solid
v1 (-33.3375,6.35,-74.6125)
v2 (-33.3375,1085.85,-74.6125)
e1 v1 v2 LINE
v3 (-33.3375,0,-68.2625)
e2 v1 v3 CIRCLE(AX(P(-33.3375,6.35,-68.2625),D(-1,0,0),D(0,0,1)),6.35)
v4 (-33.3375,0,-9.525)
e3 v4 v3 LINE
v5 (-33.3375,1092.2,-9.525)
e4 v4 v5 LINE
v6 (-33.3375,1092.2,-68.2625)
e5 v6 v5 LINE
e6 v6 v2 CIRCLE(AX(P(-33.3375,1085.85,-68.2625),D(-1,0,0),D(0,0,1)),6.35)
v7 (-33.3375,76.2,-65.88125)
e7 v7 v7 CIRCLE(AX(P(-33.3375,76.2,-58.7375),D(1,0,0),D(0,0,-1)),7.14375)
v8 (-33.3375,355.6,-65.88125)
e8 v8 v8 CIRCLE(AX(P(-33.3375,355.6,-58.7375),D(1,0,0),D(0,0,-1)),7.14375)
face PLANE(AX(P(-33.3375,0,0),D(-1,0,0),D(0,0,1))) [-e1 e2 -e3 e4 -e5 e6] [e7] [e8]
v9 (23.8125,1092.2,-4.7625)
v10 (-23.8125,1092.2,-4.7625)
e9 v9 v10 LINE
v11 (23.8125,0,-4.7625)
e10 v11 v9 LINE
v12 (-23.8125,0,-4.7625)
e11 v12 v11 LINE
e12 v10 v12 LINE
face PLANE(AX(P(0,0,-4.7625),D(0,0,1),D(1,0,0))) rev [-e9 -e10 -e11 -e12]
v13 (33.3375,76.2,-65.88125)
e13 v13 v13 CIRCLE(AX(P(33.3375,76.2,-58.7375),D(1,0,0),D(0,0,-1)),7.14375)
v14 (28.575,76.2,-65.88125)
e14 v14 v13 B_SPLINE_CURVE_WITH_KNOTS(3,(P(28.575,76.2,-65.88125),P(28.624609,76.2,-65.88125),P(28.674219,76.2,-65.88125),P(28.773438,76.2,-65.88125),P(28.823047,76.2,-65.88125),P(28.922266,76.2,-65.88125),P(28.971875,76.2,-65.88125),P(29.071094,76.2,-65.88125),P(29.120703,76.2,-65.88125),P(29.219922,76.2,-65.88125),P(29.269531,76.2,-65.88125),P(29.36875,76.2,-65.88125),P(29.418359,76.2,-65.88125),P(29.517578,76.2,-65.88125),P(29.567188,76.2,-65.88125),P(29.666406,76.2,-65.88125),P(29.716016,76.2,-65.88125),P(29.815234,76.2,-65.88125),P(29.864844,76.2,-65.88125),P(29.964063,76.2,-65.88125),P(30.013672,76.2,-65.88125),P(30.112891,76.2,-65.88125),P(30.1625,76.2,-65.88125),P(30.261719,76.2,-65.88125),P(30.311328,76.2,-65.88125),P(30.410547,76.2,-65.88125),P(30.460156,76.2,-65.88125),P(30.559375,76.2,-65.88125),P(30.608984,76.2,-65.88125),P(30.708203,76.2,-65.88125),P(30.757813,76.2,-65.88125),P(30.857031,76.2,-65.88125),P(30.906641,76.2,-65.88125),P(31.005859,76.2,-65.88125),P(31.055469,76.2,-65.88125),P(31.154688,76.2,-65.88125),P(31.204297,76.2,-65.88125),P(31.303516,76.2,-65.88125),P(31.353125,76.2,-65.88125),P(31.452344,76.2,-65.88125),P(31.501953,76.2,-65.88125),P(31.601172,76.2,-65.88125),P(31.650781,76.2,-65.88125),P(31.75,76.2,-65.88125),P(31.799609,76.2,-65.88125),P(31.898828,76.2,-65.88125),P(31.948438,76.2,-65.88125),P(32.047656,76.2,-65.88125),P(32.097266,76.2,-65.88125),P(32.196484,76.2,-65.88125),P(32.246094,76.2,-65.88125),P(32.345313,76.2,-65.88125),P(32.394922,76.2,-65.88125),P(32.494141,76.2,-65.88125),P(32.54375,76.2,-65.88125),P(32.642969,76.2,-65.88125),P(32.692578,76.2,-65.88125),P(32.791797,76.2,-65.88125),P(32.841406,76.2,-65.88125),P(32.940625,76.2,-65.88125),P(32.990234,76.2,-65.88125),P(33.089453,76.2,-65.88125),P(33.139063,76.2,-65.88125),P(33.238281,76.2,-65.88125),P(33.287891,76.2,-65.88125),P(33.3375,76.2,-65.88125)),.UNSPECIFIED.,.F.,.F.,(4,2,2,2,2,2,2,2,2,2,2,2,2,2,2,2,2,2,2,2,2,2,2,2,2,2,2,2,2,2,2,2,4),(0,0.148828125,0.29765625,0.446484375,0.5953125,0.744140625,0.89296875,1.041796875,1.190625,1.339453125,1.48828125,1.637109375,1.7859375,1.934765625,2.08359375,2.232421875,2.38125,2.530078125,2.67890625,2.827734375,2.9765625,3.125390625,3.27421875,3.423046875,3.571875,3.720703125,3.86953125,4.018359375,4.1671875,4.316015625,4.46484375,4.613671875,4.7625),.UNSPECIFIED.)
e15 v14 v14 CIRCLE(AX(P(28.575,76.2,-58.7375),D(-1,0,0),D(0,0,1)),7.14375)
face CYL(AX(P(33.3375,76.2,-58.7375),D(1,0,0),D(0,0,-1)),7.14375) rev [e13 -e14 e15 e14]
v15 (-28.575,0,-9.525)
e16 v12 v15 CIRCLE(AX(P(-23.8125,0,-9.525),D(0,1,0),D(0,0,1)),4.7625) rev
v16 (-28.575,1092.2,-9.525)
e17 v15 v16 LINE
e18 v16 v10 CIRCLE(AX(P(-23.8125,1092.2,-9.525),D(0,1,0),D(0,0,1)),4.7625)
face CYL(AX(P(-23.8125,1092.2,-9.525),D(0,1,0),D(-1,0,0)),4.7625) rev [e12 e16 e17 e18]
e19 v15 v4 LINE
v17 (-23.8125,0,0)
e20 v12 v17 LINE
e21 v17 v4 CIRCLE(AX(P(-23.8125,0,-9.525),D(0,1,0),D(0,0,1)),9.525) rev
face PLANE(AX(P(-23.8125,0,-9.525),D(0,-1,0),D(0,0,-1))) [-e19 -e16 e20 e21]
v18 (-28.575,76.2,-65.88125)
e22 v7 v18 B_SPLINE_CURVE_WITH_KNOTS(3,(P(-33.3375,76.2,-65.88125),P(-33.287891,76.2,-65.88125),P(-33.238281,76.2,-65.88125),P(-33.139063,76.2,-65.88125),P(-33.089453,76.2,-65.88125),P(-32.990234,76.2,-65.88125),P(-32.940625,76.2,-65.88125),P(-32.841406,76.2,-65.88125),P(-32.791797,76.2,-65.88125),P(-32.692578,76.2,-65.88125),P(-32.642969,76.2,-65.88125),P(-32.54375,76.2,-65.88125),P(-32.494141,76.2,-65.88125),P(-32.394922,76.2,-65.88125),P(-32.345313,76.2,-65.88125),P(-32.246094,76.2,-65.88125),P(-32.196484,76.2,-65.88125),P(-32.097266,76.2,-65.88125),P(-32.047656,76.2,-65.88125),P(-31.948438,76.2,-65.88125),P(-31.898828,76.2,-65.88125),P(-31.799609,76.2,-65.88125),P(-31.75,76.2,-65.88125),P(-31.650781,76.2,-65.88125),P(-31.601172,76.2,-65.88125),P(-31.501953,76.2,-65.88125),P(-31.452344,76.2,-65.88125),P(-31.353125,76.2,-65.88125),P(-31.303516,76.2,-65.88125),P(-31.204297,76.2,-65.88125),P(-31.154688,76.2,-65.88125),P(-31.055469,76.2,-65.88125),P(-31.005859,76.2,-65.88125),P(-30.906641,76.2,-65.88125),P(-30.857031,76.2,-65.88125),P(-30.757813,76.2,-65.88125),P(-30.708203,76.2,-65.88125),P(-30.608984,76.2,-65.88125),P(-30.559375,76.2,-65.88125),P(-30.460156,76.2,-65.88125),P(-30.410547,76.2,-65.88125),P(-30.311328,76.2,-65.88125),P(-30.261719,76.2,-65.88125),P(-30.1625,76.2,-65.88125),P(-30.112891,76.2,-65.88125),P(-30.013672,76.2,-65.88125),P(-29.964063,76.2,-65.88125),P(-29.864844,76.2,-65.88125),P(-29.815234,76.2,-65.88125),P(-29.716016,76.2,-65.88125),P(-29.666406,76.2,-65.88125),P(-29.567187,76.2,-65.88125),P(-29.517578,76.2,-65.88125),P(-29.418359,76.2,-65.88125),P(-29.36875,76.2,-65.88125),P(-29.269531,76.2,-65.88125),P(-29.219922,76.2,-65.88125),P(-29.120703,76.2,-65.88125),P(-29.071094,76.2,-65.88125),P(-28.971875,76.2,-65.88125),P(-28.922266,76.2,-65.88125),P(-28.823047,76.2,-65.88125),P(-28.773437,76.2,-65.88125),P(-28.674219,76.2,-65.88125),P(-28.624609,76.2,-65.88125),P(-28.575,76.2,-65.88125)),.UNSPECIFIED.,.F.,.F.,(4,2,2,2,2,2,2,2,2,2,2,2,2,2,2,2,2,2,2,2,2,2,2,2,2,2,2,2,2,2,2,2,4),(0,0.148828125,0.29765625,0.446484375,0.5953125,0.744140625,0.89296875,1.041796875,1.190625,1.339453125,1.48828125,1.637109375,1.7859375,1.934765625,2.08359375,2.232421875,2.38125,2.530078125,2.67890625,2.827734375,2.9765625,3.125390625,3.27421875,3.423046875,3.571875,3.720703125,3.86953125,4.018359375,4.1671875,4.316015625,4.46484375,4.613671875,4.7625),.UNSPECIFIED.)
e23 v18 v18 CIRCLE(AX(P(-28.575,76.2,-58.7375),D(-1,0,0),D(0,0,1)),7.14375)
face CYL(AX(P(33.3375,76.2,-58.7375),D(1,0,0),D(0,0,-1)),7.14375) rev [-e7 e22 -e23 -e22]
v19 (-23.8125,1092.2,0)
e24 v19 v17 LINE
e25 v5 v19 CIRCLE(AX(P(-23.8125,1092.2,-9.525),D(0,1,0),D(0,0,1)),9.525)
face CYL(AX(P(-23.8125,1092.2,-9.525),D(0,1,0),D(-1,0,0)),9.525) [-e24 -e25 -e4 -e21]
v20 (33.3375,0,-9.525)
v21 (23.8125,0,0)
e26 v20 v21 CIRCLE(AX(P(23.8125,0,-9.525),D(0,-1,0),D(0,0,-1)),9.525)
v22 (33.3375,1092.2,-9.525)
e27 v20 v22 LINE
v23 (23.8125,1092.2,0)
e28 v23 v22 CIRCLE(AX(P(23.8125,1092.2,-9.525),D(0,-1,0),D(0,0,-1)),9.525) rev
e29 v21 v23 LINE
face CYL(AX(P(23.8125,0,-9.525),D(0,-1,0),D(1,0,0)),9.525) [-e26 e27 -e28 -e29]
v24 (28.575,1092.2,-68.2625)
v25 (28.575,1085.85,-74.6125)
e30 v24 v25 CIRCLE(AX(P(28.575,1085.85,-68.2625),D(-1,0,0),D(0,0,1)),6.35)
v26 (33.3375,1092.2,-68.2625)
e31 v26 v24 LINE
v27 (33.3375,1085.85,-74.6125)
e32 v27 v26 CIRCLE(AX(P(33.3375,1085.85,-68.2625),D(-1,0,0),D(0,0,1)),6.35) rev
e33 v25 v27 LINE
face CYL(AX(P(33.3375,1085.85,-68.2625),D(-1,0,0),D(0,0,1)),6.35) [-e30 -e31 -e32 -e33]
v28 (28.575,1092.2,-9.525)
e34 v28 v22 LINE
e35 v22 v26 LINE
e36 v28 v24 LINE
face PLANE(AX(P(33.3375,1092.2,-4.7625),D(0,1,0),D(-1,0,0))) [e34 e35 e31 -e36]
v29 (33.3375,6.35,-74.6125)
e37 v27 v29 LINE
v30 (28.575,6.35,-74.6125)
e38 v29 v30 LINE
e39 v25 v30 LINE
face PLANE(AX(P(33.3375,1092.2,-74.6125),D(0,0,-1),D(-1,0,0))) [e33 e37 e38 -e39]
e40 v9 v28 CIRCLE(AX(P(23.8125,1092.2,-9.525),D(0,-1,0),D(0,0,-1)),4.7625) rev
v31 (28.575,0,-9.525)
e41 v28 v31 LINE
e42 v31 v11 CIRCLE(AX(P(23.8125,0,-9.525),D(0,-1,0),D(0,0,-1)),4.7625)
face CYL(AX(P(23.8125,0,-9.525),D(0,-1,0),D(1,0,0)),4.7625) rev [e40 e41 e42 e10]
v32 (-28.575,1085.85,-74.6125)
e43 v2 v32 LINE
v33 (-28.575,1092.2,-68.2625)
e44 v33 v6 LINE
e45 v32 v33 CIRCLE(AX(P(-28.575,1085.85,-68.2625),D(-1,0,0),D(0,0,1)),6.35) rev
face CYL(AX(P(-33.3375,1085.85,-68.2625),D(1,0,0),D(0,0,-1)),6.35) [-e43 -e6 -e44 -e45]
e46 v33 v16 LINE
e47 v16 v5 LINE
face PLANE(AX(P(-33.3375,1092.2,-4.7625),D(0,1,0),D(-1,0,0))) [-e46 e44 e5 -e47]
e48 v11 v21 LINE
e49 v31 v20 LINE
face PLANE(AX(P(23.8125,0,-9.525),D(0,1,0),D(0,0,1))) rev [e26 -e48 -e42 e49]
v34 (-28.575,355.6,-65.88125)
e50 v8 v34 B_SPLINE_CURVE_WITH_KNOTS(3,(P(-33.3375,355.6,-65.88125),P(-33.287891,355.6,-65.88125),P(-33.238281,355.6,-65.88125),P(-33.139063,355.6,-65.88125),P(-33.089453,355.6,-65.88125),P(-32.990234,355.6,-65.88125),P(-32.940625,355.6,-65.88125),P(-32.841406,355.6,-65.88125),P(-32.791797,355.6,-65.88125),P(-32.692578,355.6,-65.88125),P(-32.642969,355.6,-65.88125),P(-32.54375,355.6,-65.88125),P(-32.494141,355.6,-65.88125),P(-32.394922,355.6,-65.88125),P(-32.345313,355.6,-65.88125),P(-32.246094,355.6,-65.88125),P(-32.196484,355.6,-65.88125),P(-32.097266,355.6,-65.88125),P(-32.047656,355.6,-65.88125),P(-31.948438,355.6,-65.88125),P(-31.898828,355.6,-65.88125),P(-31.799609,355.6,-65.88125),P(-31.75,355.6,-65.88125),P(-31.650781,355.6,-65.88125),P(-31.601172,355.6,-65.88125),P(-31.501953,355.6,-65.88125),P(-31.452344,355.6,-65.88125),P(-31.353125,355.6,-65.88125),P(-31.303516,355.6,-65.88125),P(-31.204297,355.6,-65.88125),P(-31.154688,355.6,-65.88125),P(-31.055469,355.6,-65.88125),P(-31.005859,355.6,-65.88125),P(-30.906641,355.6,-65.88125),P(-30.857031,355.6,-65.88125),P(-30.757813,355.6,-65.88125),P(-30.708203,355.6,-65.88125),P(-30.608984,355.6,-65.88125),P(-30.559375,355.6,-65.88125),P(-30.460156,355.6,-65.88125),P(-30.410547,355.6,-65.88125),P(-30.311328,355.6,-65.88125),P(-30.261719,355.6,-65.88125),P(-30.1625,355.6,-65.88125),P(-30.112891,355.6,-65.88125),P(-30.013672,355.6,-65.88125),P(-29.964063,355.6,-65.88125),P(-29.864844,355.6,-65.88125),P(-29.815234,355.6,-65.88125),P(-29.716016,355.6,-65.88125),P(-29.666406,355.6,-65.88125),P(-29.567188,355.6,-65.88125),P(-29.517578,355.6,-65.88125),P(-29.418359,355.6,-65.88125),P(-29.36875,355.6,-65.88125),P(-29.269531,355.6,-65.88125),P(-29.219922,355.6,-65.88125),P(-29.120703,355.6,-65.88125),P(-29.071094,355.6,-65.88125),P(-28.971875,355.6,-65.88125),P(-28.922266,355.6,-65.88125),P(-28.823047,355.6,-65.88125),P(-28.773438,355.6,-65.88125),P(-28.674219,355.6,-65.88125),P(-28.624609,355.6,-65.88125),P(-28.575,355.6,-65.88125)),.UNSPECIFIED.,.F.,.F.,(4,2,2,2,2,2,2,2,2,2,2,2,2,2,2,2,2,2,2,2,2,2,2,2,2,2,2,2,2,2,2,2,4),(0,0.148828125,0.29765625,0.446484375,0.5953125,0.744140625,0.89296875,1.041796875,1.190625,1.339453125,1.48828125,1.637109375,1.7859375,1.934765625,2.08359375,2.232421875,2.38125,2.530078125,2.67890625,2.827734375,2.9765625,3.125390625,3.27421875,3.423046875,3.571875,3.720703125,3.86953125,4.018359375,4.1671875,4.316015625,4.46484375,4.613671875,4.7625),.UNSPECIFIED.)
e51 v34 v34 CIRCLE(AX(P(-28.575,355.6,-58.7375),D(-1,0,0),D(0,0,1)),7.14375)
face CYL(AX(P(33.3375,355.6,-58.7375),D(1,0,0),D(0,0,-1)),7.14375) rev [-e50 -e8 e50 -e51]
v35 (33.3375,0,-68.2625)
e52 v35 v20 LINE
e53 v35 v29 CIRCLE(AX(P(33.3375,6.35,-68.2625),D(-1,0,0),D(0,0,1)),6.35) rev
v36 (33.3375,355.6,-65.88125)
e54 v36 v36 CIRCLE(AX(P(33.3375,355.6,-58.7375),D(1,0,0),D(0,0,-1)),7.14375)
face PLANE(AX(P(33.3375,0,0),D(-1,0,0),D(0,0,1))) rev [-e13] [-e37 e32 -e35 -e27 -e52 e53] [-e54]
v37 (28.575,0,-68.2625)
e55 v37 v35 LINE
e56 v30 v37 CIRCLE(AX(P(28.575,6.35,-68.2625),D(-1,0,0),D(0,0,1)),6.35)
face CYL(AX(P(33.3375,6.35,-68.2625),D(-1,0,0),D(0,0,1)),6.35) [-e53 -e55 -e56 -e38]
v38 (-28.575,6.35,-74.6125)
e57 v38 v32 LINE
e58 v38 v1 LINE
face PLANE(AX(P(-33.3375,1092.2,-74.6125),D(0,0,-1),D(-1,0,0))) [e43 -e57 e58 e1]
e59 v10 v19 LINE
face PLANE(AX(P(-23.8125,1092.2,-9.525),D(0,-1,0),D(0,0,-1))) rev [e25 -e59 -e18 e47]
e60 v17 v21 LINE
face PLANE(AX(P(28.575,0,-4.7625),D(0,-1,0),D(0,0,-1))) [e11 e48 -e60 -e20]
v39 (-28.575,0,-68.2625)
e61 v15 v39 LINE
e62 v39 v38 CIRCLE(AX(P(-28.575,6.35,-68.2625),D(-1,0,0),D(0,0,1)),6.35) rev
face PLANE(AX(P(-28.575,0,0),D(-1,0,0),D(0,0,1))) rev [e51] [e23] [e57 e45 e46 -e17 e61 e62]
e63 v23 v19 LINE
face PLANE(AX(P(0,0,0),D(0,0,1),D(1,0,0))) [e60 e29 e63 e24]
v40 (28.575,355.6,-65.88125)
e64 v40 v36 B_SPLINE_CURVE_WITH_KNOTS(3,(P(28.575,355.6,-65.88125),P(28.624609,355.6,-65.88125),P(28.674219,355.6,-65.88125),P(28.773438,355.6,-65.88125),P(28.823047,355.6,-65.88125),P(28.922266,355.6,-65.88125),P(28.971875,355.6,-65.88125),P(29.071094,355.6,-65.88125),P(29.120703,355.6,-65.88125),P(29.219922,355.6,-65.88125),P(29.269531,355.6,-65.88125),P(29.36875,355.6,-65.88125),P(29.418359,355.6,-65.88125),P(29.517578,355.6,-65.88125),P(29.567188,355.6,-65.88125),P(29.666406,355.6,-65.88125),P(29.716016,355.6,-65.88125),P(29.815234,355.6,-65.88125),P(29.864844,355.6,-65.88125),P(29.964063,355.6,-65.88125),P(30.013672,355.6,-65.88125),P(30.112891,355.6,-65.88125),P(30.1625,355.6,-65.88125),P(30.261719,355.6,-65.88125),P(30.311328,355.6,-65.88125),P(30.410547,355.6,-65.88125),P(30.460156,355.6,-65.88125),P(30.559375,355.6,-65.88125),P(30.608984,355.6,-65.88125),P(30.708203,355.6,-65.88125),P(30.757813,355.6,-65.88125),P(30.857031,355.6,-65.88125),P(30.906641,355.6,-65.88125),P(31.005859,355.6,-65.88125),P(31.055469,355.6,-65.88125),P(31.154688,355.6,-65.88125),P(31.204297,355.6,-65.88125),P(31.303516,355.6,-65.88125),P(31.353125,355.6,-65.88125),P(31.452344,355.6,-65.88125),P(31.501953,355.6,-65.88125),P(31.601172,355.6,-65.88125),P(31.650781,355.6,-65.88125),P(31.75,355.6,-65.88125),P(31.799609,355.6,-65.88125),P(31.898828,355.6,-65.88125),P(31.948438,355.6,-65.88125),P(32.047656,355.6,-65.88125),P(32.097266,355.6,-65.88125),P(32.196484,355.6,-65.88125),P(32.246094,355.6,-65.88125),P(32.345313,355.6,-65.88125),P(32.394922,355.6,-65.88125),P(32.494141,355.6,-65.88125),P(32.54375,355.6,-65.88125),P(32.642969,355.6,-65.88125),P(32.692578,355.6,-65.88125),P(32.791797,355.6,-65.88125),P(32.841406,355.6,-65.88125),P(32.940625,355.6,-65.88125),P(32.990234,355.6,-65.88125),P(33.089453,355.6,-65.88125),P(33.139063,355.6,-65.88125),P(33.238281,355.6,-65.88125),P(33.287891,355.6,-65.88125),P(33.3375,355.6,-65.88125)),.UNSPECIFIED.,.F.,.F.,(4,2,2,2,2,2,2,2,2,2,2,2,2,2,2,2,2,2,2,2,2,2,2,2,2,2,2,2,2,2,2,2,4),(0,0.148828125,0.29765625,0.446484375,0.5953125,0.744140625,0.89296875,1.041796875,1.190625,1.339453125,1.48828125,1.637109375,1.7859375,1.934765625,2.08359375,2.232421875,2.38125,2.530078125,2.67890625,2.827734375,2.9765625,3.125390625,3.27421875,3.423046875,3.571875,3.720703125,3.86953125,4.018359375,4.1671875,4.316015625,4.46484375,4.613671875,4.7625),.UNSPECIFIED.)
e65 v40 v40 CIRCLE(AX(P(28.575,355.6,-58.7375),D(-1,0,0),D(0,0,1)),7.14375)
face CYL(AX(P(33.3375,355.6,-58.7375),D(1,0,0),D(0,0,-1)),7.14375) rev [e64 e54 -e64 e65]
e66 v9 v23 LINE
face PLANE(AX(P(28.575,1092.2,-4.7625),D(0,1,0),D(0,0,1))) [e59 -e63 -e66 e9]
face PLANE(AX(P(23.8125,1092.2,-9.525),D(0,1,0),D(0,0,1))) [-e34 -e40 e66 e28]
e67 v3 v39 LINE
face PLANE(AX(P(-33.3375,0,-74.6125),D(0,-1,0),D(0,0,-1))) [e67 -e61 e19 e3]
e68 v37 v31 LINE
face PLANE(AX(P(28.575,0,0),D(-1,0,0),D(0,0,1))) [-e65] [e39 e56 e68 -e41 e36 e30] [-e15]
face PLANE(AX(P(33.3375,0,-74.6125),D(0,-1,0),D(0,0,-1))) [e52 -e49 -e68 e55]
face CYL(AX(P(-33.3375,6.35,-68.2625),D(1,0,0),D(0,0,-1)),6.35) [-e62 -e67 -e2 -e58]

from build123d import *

# Parameters (mm, degrees)
SKETCH1_W                      = 57.15
SKETCH1_H                      = 1092.2
BASE_FLANGE1_DEPTH             = 4.7625
EDGE_FLANGE1_STRIP_W           = 28.575
EDGE_FLANGE1_STRIP_H           = 4.7625
EDGE_FLANGE1_STRIP_CUT_DEPTH   = 1092.2
EDGE_FLANGE1_STRIP_2_W         = 28.575
EDGE_FLANGE1_STRIP_2_H         = 4.7625
EDGE_FLANGE1_STRIP_CUT_2_DEPTH = 1092.2
EDGE_FLANGE1_DEPTH             = 1092.2
EDGE_FLANGE1_BEND_DEPTH        = 1092.2
F_1_2_CLEARANCE_HOLE1_D        = 14.2875
FILLET1_R                      = 6.35


# Sheet-metal steps are written as plain solids
with BuildPart() as part:
    # Sketch1 → Base-Flange1 (new body)
    with BuildSketch(Plane.XY):
        with Locations((0, 546.1)):
            Rectangle(SKETCH1_W, SKETCH1_H)
    extrude(amount=-BASE_FLANGE1_DEPTH)

    # Edge-Flange1 strip (across the edge) → Edge-Flange1 strip cut (cut)
    with BuildSketch(Plane(origin=(-28.575, 0, -4.7625), x_dir=(1, 0, 0), z_dir=(0, 1, 0))):
        with Locations((-9.525, -2.38125)):
            Rectangle(EDGE_FLANGE1_STRIP_W, EDGE_FLANGE1_STRIP_H)
    extrude(amount=EDGE_FLANGE1_STRIP_CUT_DEPTH, mode=Mode.SUBTRACT)

    # Edge-Flange1 strip 2 (across the edge) → Edge-Flange1 strip cut 2 (cut)
    with BuildSketch(Plane(origin=(28.575, 1092.2, -4.7625), x_dir=(-1, 0, 0), z_dir=(0, -1, 0))):
        with Locations((-9.525, -2.38125)):
            Rectangle(EDGE_FLANGE1_STRIP_2_W, EDGE_FLANGE1_STRIP_2_H)
    extrude(amount=EDGE_FLANGE1_STRIP_CUT_2_DEPTH, mode=Mode.SUBTRACT)

    # Edge-Flange1 section (across the edge) → Edge-Flange1 (add)
    with BuildSketch(Plane(origin=(-28.575, 0, -4.7625), x_dir=(1, 0, 0), z_dir=(0, 1, 0))):
        with BuildLine():
            Line((-4.7625, 4.7625), (-4.7625, 69.85))
            Line((-4.7625, 69.85), (0, 69.85))
            Line((0, 69.85), (0, 4.7625))
            ThreePointArc((0, 4.7625), (1.394903955, 1.394903955), (4.7625, 0))
            Line((4.7625, 0), (4.7625, -4.7625))
            ThreePointArc((4.7625, -4.7625), (-1.972692091, -1.972692091), (-4.7625, 4.7625))
        make_face()
    extrude(amount=EDGE_FLANGE1_DEPTH)

    # Edge-Flange1 section 2 (across the edge) → Edge-Flange1 bend (add)
    with BuildSketch(Plane(origin=(28.575, 1092.2, -4.7625), x_dir=(-1, 0, 0), z_dir=(0, -1, 0))):
        with BuildLine():
            Line((-4.7625, 4.7625), (-4.7625, 69.85))
            Line((-4.7625, 69.85), (0, 69.85))
            Line((0, 69.85), (0, 4.7625))
            ThreePointArc((0, 4.7625), (1.394903955, 1.394903955), (4.7625, 0))
            Line((4.7625, 0), (4.7625, -4.7625))
            ThreePointArc((4.7625, -4.7625), (-1.972692091, -1.972692091), (-4.7625, 4.7625))
        make_face()
    extrude(amount=EDGE_FLANGE1_BEND_DEPTH)

    # 1/2 Clearance Hole1 (through all)
    with Locations(Plane(origin=(33.3375, 0, 0), x_dir=(0, 0, -1), z_dir=(1, 0, 0))):
        with Locations((58.7375, 76.2), (58.7375, 355.6)):
            Hole(F_1_2_CLEARANCE_HOLE1_D / 2)

    # Fillet1
    fillet1_edges = [part.edges().sort_by_distance(p)[0] for p in [
        (-30.95625, 0, -74.6125),
        (-30.95625, 1092.2, -74.6125),
        (30.95625, 1092.2, -74.6125),
        (30.95625, 0, -74.6125),
    ]]
    fillet(fillet1_edges, radius=FILLET1_R)


solid = part.part
